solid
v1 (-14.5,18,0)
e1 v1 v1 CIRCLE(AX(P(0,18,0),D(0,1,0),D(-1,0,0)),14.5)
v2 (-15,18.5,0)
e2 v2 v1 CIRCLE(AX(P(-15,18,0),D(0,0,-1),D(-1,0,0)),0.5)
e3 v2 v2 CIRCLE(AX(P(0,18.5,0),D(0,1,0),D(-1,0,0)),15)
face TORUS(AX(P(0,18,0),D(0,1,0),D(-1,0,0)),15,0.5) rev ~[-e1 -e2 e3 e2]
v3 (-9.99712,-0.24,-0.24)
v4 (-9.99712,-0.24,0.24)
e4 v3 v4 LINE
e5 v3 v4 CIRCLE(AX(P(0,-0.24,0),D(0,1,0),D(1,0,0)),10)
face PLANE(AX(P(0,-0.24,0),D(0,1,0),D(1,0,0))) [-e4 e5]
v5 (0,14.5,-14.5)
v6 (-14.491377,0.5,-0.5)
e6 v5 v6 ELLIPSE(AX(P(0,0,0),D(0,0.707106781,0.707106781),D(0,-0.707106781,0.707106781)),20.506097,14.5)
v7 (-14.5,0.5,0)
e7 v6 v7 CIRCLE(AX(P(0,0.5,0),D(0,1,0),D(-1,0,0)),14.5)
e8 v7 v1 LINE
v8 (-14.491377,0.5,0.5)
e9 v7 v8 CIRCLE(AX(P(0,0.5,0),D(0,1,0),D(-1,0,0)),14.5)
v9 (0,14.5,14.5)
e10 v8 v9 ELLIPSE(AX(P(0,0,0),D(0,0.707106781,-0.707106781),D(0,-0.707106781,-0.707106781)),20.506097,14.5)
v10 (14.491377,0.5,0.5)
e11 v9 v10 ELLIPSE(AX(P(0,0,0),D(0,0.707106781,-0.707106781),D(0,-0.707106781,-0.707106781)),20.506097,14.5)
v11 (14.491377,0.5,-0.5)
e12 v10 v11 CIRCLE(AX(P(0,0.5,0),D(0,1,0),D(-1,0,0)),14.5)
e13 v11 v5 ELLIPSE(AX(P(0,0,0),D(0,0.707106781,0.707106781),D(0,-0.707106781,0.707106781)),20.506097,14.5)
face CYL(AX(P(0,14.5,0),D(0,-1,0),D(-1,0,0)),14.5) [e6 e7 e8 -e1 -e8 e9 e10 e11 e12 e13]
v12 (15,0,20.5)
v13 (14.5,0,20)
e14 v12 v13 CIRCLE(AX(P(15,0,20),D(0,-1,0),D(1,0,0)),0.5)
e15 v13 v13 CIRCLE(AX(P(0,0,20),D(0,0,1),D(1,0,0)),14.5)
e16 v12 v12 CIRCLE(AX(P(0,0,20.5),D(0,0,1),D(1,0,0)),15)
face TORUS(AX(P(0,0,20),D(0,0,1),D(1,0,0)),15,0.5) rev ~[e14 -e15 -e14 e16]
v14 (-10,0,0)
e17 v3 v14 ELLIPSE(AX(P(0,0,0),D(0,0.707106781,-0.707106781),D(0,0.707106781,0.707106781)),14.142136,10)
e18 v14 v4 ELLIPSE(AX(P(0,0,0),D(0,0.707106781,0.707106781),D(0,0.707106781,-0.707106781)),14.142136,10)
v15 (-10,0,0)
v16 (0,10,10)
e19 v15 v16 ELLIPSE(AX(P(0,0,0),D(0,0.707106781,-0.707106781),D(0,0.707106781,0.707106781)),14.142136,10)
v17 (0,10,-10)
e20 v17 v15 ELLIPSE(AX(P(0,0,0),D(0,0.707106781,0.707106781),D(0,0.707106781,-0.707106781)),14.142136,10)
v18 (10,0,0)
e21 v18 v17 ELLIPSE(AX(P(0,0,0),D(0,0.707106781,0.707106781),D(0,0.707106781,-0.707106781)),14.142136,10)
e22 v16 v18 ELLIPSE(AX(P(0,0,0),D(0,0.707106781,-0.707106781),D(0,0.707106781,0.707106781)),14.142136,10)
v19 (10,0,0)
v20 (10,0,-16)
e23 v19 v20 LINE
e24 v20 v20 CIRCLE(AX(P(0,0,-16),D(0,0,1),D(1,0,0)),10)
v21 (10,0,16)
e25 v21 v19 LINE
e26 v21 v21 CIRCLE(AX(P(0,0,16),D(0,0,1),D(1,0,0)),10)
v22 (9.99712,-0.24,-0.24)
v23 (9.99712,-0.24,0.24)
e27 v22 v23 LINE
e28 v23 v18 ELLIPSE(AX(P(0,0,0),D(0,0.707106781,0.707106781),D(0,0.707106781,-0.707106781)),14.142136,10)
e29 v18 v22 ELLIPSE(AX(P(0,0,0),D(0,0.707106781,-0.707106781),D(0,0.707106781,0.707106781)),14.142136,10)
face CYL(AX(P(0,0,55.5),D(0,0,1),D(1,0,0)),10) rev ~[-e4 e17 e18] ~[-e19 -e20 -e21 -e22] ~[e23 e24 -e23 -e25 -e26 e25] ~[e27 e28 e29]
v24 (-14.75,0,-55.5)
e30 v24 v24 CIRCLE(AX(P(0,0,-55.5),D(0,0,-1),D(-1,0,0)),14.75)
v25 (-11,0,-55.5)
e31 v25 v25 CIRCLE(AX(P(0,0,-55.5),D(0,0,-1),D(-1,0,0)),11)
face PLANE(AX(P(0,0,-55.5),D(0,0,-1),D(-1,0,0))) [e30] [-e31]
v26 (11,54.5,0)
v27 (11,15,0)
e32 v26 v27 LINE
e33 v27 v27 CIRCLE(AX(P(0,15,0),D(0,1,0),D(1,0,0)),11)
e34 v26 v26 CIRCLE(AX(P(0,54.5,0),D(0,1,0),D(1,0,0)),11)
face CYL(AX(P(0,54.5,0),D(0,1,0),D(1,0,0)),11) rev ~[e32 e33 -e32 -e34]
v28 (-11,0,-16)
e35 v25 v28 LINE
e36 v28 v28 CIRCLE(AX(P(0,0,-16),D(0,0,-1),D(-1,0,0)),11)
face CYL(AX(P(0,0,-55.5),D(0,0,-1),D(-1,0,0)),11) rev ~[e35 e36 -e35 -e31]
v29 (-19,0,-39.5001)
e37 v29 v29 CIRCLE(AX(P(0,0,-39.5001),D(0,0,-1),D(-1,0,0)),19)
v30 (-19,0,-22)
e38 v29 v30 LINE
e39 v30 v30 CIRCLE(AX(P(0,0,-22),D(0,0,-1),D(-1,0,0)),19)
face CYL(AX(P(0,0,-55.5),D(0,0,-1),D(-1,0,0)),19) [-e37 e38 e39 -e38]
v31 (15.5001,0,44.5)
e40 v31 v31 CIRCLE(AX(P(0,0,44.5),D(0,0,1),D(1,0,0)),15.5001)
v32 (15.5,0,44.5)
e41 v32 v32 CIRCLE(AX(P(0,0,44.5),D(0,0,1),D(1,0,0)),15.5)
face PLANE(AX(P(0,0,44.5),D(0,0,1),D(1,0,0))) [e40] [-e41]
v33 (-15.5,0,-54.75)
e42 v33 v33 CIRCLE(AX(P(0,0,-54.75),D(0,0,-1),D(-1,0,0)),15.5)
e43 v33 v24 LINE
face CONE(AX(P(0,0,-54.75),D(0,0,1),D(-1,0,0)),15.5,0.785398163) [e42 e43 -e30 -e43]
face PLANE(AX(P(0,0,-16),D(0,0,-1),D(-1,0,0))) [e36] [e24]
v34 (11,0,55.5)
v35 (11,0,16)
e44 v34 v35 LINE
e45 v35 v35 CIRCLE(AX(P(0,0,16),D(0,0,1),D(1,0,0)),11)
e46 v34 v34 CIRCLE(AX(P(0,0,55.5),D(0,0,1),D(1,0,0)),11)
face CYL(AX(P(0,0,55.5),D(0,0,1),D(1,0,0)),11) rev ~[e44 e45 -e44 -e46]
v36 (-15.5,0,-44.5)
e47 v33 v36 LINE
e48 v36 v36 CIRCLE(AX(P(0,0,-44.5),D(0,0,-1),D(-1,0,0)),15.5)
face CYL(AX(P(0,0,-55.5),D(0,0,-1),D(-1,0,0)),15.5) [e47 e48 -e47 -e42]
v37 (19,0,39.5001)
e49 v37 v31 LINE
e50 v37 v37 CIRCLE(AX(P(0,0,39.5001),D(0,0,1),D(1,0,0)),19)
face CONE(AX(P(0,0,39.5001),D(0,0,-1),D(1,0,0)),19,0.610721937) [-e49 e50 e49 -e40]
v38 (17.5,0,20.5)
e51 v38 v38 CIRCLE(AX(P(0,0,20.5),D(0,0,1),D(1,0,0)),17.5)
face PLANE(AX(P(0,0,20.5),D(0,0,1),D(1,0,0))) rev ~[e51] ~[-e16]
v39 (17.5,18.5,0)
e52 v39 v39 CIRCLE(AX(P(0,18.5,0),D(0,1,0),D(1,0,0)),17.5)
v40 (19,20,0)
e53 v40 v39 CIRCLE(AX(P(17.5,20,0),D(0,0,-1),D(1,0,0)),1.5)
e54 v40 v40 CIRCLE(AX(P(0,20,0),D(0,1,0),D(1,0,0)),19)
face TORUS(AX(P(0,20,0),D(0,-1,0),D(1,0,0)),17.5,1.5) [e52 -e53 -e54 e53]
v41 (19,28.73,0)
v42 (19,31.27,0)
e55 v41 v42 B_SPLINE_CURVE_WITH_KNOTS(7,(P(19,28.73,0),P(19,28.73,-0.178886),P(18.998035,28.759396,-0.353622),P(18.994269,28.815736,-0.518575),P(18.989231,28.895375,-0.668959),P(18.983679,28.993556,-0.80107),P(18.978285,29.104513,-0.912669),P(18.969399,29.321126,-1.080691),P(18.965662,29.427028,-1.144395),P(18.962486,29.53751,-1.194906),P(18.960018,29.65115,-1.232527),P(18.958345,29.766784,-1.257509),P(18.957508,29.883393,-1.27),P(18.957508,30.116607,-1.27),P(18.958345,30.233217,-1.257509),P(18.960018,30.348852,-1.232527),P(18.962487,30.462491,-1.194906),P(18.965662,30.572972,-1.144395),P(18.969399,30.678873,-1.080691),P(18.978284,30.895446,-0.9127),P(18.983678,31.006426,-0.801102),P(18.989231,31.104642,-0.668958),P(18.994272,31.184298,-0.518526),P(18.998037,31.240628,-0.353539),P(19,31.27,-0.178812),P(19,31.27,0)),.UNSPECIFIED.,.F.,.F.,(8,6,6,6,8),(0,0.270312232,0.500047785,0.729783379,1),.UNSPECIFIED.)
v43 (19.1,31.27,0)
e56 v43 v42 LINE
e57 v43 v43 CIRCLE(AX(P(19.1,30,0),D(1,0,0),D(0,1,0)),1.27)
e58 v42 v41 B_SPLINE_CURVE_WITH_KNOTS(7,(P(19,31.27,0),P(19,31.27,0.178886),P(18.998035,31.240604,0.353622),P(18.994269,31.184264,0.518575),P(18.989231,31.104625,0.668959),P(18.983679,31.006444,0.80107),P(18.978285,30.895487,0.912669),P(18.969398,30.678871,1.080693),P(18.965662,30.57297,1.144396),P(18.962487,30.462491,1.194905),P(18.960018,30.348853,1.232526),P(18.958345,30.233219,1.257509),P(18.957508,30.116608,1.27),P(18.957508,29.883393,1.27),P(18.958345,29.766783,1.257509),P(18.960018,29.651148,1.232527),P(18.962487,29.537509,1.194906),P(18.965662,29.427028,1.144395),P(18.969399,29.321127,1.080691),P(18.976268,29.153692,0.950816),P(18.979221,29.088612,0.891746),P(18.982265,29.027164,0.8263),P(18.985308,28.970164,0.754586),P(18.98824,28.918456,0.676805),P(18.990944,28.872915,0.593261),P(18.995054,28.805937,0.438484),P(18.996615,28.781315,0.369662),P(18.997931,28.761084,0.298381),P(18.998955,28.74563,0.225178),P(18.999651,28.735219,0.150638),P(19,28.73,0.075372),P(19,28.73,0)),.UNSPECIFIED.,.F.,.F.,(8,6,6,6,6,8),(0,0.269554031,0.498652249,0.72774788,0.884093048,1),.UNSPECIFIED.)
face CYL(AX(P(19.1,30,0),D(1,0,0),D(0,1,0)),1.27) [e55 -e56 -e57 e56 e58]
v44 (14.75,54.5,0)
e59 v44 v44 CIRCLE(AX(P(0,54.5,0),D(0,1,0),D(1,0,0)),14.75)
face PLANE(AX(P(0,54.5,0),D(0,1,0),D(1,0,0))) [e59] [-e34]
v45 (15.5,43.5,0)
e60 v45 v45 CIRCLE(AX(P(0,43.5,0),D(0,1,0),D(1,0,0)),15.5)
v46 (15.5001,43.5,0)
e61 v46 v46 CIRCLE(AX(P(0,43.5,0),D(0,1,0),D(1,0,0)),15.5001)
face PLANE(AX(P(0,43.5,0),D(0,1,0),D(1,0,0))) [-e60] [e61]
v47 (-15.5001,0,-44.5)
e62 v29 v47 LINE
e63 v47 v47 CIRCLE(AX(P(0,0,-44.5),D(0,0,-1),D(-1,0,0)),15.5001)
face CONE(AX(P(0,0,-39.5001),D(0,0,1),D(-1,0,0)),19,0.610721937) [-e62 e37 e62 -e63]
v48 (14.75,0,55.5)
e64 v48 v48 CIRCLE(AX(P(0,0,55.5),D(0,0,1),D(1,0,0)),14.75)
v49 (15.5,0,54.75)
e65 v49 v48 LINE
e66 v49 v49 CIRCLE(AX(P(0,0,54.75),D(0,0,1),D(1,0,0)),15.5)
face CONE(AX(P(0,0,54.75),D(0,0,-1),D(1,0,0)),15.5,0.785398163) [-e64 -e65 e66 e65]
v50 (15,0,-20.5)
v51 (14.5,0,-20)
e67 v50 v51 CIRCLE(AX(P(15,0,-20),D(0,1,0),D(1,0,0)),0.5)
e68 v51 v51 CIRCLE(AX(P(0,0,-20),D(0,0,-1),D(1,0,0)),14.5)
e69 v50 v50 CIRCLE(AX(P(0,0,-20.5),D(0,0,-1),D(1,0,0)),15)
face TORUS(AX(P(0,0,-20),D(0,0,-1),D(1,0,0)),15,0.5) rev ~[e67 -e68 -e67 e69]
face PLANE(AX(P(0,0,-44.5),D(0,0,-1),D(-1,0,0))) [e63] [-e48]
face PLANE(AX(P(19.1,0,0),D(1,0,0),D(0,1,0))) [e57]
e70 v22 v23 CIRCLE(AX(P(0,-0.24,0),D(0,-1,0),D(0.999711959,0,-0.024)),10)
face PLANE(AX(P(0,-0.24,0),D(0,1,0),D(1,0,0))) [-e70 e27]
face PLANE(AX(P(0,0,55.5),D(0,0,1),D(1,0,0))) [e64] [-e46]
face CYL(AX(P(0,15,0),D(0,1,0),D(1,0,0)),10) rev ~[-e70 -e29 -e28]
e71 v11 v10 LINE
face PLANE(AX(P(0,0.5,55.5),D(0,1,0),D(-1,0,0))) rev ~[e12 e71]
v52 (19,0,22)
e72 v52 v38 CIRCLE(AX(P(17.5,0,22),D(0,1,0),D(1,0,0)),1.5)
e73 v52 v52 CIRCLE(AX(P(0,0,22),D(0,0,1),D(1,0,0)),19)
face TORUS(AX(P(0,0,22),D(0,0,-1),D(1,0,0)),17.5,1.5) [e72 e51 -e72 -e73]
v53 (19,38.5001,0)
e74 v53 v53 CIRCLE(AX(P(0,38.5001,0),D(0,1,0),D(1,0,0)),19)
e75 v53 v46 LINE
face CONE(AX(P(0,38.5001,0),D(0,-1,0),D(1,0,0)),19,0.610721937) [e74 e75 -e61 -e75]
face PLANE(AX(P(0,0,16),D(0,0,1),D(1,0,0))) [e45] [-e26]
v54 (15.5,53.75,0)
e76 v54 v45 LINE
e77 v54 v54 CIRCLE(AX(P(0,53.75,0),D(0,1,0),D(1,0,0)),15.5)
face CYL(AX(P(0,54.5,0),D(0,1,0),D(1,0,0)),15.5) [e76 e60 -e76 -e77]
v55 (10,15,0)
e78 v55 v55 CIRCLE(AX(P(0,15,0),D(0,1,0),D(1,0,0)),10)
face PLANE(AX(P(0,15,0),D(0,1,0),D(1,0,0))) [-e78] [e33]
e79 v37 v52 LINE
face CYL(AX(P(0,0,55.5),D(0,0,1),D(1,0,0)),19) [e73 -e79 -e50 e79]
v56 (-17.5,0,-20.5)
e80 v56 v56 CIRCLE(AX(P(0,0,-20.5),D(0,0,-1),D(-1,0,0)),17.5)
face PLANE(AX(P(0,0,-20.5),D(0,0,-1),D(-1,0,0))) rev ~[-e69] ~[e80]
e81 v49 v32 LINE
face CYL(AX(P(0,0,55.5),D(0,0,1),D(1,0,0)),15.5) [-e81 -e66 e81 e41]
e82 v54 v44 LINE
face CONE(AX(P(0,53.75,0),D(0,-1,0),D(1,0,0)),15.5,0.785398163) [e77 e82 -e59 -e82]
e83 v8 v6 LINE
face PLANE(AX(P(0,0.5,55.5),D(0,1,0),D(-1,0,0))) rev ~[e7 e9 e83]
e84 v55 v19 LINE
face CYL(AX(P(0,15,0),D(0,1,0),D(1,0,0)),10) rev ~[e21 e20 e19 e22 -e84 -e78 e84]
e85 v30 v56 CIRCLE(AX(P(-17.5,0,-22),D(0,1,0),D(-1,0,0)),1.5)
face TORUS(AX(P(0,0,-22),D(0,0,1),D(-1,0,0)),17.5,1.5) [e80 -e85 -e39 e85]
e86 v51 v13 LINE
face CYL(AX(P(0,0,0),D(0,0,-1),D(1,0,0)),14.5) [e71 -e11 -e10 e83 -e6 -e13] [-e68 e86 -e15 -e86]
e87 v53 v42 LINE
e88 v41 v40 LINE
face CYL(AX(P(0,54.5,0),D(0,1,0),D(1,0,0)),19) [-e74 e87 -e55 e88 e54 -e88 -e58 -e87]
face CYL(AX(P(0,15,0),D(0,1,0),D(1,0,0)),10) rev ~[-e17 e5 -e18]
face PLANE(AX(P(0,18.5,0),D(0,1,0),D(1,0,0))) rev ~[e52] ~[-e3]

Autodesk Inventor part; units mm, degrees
sketch "Sketch1" plane through (0, 0, 0) normal (0, 0, 1) x (1, 0, 0)
  circle A0 centre (0, 0) radius 14.5
  dimension "d0" = 29
extrude "mainBody" add sketch "Sketch1" along normal mid plane 111
sketch "Sketch10" plane through (0, 0, 55.5) normal (0, 0, 1) x (1, 0, 0)
  circle A0 centre (0, 0) radius 30.1625 projected
  circle A1 centre (0, 0) radius 14.5 projected
  point P0 (0, 14.5)
ref_plane "Work Plane5" through (0, 14.5, 55.5) normal (0, 1, 0) x (-1, 0, 0)
sketch "Sketch11" plane through (0, 14.5, 55.5) normal (0, 1, 0) x (-1, 0, 0)
  circle A0 centre (0, -55.5) radius 14.5
  line L0 (14.5, 0) -> (-14.5, 0) projected
  point P0 (0, -55.5)
  dimension "d29" = 55.5
  dimension "d30" = 29
extrude "TBody" add sketch "Sketch11" along normal blind 40 and the other way blind 14
sketch "Sketch12" plane through (0, 54.5, 0) normal (0, 1, 0) x (1, 0, 0)
  circle A0 centre (0, 0) radius 14.5 projected
  circle A1 centre (0, 0) radius 11
  point P0 (0, 0)
  dimension "d35" = 22
extrude "TSocket" cut sketch "Sketch12" against normal blind 39.5 contours A1
sketch "Sketch13" plane through (0, 15, 0) normal (0, 1, 0) x (1, 0, 0)
  circle A0 centre (0, 0) radius 11 projected
  circle A1 centre (0, 0) radius 10
  point P0 (0, 0)
  dimension "d39" = 20
extrude "TTube" cut sketch "Sketch13" against normal blind 15.24 contours A1
sketch "Sketch14" plane through (0, 0, 55.5) normal (0, 0, 1) x (1, 0, 0)
  circle A0 centre (0, 0) radius 14.5 projected
  circle A1 centre (0, 0) radius 10
  dimension "d43" = 20
extrude "mainTube" cut sketch "Sketch14" against normal blind 177.8 contours A1
sketch "Sketch15" plane through (0, 0, 55.5) normal (0, 0, 1) x (1, 0, 0)
  circle A0 centre (0, 0) radius 10 projected
  circle A1 centre (0, 0) radius 14.5 projected
  circle A2 centre (0, 0) radius 11
  dimension "d47" = 22
extrude "mainSocket1" cut sketch "Sketch15" against normal blind 39.5 contours A2
sketch "Sketch16" plane through (0, 0, -55.5) normal (0, 0, -1) x (-1, 0, 0)
  circle A0 centre (0, 0) radius 10 projected
  circle A1 centre (0, 0) radius 14.5 projected
  circle A2 centre (0, 0) radius 11
  dimension "d51" = 22
extrude "mainSocket2" cut sketch "Sketch16" against normal blind 39.5 contours A2
sketch "Sketch21" plane through (0, 54.5, 0) normal (0, 1, 0) x (1, 0, 0)
  circle A0 centre (0, 0) radius 11 projected
  circle A1 centre (0, 0) radius 14.5 projected
  point P0 (0, 0)
  point P1 (14.5, 0)
ref_plane "Work Plane6" through (14.5, 54.5, 0) normal (1, 0, 0) x (0, 1, 0)
sketch "Sketch22" plane through (14.5, 54.5, 0) normal (1, 0, 0) x (0, 1, 0)
  circle A0 centre (-23, -0.01) radius 1.7314
  line L0 (0, -14.5) -> (0, 14.5) projected
  point P0 (-54.5, 0)
  dimension "d73" = 23
extrude "Extrusion18" add sketch "Sketch22" along normal blind 0.254
sketch "Sketch23" plane through (0, 54.5, 0) normal (0, 1, 0) x (1, 0, 0)
  circle A0 centre (0, 0) radius 14.5
  circle A1 centre (0, 0) radius 19
  dimension "d76" = 38
extrude "Extrusion19" add sketch "Sketch23" against normal blind 36
sketch "Sketch24" plane through (0, 54.5, 0) normal (0, 1, 0) x (1, 0, 0)
  circle A0 centre (0, 0) radius 19
  circle A1 centre (0, 0) radius 15.5
  dimension "d79" = 31
extrude "Extrusion20" cut sketch "Sketch24" against normal blind 11
chamfer "Chamfer1" distance 5 distance2 3.5 1 edges at (-19, 43.5, 0) measured on face at (18.754, 26.8333, 3.0478)
fillet "Fillet1" radius 1.5 1 edges at (-19, 18.5, 0)
fillet "Fillet2" radius 0.5 1 edges at (14.5, 18.5, 0)
chamfer "Chamfer2" distance 0.75 angle 45 1 edges at (-15.5, 54.5, 0)
sketch "Sketch25" plane through (0, 0, 55.5) normal (0, 0, 1) x (1, 0, 0)
  circle A0 centre (0, 0) radius 14.5
  circle A1 centre (0, 0) radius 19
  dimension "d90" = 38
extrude "Extrusion21" add sketch "Sketch25" against normal blind 35
sketch "Sketch26" plane through (0, 0, 55.5) normal (0, 0, 1) x (1, 0, 0)
  circle A0 centre (0, 0) radius 19
  circle A1 centre (0, 0) radius 15.5
  dimension "d93" = 31
extrude "Extrusion22" cut sketch "Sketch26" against normal blind 11
chamfer "Chamfer3" distance 5 distance2 3.5 1 edges at (-19, 0, 44.5) measured on face at (18.9384, -1.5289, 28.5)
fillet "Fillet5" radius 1.5 1 edges at (-19, 0, 20.5)
fillet "Fillet4" radius 0.5 1 edges at (-14.5, 0, 20.5)
chamfer "Chamfer4" distance 0.75 angle 45 1 edges at (-15.5, 0, 55.5)
sketch "Sketch27" plane through (0, 0, -55.5) normal (0, 0, -1) x (-1, 0, 0)
  circle A0 centre (0, 0) radius 14.5
  circle A1 centre (0, 0) radius 19
  dimension "d105" = 38
extrude "Extrusion23" add sketch "Sketch27" against normal blind 35
sketch "Sketch28" plane through (0, 0, -55.5) normal (0, 0, -1) x (-1, 0, 0)
  circle A0 centre (0, 0) radius 19
  circle A1 centre (0, 0) radius 15.5
  dimension "d108" = 31
extrude "Extrusion24" cut sketch "Sketch28" against normal blind 11
chamfer "Chamfer5" distance 5 distance2 3.5 1 edges at (19, 0, -44.5) measured on face at (-18.9384, -1.5289, -28.5)
fillet "Fillet6" radius 1.5 1 edges at (19, 0, -20.5)
fillet "Fillet7" radius 0.5 1 edges at (-14.5, 0, -20.5)
chamfer "Chamfer6" distance 0.75 angle 45 1 edges at (15.5, 0, -55.5)
ref_plane "Work Plane7" through (19.1, 0, 0) normal (1, 0, 0) x (0, 1, 0)
sketch "Sketch29" plane through (19.1, 0, 0) normal (1, 0, 0) x (0, 1, 0)
  circle A0 centre (30, 0) radius 1.27
  point P0 (0, 0)
  dimension "d120" = 2.54
  dimension "d121" = 30
extrude "Extrusion25" add sketch "Sketch29" against normal up to surface
properties part number "0pvc_T_0.75" material "PVC-Piping"
